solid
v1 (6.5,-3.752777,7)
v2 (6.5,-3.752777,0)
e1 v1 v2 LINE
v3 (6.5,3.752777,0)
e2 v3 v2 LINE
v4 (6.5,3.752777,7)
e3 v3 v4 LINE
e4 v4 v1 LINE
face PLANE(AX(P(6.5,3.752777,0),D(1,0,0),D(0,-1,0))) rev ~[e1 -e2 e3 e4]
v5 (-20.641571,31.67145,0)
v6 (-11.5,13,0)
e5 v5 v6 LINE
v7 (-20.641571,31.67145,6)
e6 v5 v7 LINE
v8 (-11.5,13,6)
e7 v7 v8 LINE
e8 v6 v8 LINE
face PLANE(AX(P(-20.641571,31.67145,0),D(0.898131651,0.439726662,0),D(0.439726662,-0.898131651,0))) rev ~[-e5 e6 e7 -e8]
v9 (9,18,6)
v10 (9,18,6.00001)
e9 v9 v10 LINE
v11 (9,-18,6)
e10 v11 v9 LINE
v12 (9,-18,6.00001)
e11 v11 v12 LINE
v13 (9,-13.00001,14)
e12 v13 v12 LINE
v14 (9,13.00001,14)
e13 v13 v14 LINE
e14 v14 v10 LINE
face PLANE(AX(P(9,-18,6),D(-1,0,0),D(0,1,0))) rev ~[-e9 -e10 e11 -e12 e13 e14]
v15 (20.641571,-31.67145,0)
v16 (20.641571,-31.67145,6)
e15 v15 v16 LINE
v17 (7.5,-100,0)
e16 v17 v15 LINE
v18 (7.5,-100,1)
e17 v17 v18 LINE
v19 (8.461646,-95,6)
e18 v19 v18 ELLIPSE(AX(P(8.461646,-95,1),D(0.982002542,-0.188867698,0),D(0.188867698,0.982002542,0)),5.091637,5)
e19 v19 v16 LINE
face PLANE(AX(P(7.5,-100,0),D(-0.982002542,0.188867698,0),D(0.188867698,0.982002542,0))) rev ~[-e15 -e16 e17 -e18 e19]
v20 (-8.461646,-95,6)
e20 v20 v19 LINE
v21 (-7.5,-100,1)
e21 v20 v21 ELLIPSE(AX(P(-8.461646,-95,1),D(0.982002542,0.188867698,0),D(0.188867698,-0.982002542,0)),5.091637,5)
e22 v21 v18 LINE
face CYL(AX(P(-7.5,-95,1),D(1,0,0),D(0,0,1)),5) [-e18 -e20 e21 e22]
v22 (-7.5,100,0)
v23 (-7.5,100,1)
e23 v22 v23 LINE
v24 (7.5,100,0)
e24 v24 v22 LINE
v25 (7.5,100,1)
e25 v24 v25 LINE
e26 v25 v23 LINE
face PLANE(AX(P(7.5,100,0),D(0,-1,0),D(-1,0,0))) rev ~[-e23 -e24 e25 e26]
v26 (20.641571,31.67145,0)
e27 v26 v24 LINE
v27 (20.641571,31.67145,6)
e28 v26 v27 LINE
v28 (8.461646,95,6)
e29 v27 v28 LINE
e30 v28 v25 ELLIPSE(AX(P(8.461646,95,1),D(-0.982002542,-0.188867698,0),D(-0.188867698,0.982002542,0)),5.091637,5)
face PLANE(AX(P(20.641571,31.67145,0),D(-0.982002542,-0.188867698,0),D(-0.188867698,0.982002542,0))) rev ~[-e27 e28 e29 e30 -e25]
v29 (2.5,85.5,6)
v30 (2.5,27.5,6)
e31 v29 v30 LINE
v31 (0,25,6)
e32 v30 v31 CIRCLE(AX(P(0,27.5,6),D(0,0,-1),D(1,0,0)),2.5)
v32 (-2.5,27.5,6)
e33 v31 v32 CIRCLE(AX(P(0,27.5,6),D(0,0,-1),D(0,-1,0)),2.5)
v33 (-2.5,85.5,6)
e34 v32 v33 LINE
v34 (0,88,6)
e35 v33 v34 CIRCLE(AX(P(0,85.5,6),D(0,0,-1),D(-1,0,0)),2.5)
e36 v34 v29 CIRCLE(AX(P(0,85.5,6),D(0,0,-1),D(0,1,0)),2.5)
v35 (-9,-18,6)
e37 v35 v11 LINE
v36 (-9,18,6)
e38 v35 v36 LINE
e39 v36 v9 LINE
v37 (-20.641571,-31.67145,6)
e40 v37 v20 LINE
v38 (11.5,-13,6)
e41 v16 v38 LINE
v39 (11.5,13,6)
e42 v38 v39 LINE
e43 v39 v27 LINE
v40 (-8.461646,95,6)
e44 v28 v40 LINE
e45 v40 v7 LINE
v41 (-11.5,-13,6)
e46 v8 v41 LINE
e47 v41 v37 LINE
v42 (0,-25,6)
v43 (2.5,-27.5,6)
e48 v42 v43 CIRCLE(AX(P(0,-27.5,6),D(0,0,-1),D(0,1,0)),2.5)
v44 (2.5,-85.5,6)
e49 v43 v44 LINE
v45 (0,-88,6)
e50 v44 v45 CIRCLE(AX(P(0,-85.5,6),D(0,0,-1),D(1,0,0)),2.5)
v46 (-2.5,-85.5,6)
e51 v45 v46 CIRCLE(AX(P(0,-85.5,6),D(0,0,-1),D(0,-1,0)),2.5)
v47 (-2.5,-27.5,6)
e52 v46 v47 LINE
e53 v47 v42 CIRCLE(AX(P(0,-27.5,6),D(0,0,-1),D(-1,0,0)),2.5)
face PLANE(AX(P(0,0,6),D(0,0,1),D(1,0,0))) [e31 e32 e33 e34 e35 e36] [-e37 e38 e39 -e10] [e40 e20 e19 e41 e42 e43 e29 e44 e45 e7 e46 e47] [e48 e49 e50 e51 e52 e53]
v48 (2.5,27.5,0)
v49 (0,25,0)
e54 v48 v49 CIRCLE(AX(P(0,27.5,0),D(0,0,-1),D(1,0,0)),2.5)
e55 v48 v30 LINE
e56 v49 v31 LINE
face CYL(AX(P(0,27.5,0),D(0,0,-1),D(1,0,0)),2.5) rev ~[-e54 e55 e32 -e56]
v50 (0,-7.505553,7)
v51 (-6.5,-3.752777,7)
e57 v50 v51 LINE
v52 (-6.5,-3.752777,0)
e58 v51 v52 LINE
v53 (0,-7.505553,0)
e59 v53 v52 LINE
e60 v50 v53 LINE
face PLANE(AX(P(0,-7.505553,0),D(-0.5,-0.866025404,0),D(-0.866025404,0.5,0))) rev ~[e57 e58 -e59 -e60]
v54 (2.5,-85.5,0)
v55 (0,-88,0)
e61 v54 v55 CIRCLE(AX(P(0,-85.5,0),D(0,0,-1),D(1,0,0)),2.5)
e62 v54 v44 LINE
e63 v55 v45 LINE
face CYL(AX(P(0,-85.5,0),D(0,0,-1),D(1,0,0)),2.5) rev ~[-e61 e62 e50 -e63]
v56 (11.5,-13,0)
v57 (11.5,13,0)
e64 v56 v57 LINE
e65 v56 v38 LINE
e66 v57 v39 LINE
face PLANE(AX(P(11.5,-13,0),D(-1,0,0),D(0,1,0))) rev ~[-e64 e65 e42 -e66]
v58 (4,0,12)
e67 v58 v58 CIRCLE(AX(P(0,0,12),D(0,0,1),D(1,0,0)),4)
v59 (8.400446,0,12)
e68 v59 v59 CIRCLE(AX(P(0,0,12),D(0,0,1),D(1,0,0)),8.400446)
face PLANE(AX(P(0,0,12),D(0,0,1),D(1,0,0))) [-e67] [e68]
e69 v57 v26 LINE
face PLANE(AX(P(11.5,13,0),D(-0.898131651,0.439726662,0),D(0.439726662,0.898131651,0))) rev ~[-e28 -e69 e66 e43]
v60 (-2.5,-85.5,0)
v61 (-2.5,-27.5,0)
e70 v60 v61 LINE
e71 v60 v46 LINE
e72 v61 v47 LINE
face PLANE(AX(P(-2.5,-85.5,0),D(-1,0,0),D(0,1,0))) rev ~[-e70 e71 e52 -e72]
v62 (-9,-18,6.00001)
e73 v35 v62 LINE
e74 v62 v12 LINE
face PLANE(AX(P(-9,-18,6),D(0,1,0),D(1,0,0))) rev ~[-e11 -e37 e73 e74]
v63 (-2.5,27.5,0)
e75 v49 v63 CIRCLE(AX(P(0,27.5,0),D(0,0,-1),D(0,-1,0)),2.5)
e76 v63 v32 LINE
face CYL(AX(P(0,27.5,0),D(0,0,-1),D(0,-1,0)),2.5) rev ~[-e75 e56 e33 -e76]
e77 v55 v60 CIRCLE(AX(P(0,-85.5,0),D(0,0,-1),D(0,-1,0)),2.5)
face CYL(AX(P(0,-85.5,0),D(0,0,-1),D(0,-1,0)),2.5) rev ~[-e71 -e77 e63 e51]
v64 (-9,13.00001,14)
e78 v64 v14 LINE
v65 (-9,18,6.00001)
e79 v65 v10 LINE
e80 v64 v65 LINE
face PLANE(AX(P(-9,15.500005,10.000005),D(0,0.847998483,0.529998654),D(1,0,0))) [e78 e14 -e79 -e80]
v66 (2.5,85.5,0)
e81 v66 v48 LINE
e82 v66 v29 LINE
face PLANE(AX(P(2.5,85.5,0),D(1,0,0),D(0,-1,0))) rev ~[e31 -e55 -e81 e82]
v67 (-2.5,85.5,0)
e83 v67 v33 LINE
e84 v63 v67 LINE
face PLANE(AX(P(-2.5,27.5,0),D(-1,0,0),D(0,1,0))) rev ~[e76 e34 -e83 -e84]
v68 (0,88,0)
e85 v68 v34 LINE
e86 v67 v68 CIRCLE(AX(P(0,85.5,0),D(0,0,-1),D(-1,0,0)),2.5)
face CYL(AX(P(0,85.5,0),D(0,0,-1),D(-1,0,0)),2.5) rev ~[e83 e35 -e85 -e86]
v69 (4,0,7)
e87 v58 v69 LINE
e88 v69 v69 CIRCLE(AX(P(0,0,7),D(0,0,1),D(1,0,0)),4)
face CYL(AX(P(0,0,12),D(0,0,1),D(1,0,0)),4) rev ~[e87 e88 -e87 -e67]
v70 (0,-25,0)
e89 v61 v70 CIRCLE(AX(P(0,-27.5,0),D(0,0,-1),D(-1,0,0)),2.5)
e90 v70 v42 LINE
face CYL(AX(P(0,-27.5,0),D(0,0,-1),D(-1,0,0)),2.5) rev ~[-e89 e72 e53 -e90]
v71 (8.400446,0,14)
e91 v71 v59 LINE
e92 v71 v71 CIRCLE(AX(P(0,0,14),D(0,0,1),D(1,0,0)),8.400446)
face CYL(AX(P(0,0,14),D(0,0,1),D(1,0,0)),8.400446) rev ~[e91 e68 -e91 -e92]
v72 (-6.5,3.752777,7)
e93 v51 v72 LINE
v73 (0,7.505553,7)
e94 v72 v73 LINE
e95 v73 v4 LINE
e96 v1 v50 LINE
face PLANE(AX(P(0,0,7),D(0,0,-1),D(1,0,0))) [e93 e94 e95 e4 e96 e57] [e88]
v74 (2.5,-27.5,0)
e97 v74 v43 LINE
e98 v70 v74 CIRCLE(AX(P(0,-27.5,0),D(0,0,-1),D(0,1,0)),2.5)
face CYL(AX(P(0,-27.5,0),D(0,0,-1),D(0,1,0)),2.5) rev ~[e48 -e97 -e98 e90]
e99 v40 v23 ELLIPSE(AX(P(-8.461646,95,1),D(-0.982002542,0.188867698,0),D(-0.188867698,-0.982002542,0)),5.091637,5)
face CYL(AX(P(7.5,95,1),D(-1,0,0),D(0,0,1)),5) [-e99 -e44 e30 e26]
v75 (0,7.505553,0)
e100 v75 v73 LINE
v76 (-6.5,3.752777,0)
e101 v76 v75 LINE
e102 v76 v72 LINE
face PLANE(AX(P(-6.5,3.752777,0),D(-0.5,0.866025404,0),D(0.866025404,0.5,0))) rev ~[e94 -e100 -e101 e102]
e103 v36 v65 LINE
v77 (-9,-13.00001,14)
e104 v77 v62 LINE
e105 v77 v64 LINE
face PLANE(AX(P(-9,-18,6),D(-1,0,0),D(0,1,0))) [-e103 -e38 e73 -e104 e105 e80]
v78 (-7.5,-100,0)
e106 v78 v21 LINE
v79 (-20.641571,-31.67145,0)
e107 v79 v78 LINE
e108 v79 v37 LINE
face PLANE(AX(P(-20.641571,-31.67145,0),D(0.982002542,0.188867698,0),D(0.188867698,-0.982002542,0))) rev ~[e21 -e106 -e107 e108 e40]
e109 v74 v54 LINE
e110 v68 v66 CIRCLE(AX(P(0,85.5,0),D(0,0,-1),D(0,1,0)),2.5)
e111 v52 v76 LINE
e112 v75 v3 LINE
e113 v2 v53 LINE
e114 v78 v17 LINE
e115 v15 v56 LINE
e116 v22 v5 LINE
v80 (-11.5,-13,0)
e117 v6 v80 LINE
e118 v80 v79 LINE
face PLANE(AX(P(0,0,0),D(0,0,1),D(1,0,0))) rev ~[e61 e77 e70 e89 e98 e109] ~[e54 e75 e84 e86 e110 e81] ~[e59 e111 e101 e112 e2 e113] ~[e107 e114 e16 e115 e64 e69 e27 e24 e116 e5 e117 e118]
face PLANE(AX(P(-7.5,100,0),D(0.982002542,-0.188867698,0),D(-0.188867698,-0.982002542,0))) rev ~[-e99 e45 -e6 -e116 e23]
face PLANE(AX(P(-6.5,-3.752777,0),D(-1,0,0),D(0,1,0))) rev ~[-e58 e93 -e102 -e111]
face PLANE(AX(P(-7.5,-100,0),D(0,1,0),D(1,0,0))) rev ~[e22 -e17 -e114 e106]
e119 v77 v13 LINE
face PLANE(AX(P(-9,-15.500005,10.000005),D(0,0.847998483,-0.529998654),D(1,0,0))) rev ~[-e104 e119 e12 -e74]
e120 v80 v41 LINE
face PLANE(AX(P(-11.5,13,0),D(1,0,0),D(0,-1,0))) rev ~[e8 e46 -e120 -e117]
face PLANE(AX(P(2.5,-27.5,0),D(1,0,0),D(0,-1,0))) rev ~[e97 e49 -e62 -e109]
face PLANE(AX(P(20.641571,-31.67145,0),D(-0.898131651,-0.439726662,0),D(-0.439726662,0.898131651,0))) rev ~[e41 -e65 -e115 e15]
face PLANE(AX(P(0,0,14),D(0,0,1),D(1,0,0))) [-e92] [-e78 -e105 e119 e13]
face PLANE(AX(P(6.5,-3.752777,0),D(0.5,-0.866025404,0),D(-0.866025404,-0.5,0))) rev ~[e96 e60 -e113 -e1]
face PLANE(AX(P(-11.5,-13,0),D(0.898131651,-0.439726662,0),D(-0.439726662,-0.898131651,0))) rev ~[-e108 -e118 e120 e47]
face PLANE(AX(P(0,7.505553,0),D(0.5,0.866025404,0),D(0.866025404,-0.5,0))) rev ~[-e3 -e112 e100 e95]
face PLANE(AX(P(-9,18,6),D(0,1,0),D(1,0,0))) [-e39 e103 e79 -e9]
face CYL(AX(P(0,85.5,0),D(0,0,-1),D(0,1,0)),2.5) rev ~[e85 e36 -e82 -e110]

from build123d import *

# Parameters (mm, degrees)
F1_DEPTH  = 6
F2_W      = 18
F2_H      = 36
F3_DEPTH  = 8
F4_SIZE2  = 7.99999
F4_SIZE   = 4.99999
F6_DEPTH  = 1
F7_R      = 8.4004464167
F8_DEPTH  = 2
F9_R      = 4
F10_DEPTH = 25
F11_R     = 5


# Not quite as in the source:
# - a fillet or chamfer is up to 0.001 mm smaller than in the source, because OpenCascade refuses the exact size


with BuildPart() as f1:
    # F0 (on Top) → F1 (new body)
    with BuildSketch(Plane.XY):
        Polygon((7.5, 100), (-7.5, 100), (-20.6415709108, 31.671449542), (-11.5, 13), (-11.5, -13), (-20.6415709108, -31.671449542), (-7.5, -100), (7.5, -100), (20.6415709108, -31.671449542), (11.5, -13), (11.5, 13), (20.6415709108, 31.671449542), align=None)
        with BuildLine():
            ThreePointArc((0, -88), (-1.767766953, -87.267766953), (-2.5, -85.5))
            Line((-2.5, -85.5), (-2.5, -27.5))
            ThreePointArc((-2.5, -27.5), (-1.767766953, -25.732233047), (0, -25))
            ThreePointArc((0, -25), (1.767766953, -25.732233047), (2.5, -27.5))
            Line((2.5, -27.5), (2.5, -85.5))
            ThreePointArc((2.5, -85.5), (1.767766953, -87.267766953), (0, -88))
        make_face(mode=Mode.SUBTRACT)
        Polygon((-6.5, 3.7527767497), (0, 7.5055534995), (6.5, 3.7527767497), (6.5, -3.7527767497), (0, -7.5055534995), (-6.5, -3.7527767497), align=None, mode=Mode.SUBTRACT)
        with BuildLine():
            ThreePointArc((0, 25), (-1.767766953, 25.732233047), (-2.5, 27.5))
            Line((-2.5, 27.5), (-2.5, 85.5))
            ThreePointArc((-2.5, 85.5), (-1.767766953, 87.267766953), (0, 88))
            ThreePointArc((0, 88), (1.767766953, 87.267766953), (2.5, 85.5))
            Line((2.5, 85.5), (2.5, 27.5))
            ThreePointArc((2.5, 27.5), (1.767766953, 25.732233047), (0, 25))
        make_face(mode=Mode.SUBTRACT)
    extrude(amount=F1_DEPTH)

    # F2 (on face) → F3 (join)
    with BuildSketch(Plane.XY.offset(6)):
        Rectangle(F2_W, F2_H)
    extrude(amount=F3_DEPTH)

    # F4 (size 5 and 8 in the source; OpenCascade refuses exactly that, so slightly less here)
    f4_edges = [f1.edges().sort_by_distance(p)[0] for p in [
        (0, -18, 14),
        (0, 18, 14),
    ]]
    f4_side = f1.faces().sort_by_distance((0, 0, 14))[0]
    chamfer(f4_edges, length=F4_SIZE, length2=F4_SIZE2, reference=f4_side)

    # F5 (on face) → F6 (cut)
    with BuildSketch(Plane(origin=(0, 0, 6), x_dir=(1, 0, 0), z_dir=(0, 0, -1))):
        Polygon((6.5, 3.7527767497), (0, 7.5055534995), (-6.5, 3.7527767497), (-6.5, -3.7527767497), (0, -7.5055534995), (6.5, -3.7527767497), align=None)
    extrude(amount=-F6_DEPTH, mode=Mode.SUBTRACT)

    # F7 (on face) → F8 (cut)
    with BuildSketch(Plane.XY.offset(14)):
        Circle(F7_R)
    extrude(amount=-F8_DEPTH, mode=Mode.SUBTRACT)

    # F9 (on face) → F10 (cut)
    with BuildSketch(Plane.XY.offset(12)):
        Circle(F9_R)
    extrude(amount=-F10_DEPTH, mode=Mode.SUBTRACT)

    # F11
    f11_edges = [f1.edges().sort_by_distance(p)[0] for p in [
        (0, -100, 6),
        (0, 100, 6),
    ]]
    fillet(f11_edges, radius=F11_R)


solid = f1.part
